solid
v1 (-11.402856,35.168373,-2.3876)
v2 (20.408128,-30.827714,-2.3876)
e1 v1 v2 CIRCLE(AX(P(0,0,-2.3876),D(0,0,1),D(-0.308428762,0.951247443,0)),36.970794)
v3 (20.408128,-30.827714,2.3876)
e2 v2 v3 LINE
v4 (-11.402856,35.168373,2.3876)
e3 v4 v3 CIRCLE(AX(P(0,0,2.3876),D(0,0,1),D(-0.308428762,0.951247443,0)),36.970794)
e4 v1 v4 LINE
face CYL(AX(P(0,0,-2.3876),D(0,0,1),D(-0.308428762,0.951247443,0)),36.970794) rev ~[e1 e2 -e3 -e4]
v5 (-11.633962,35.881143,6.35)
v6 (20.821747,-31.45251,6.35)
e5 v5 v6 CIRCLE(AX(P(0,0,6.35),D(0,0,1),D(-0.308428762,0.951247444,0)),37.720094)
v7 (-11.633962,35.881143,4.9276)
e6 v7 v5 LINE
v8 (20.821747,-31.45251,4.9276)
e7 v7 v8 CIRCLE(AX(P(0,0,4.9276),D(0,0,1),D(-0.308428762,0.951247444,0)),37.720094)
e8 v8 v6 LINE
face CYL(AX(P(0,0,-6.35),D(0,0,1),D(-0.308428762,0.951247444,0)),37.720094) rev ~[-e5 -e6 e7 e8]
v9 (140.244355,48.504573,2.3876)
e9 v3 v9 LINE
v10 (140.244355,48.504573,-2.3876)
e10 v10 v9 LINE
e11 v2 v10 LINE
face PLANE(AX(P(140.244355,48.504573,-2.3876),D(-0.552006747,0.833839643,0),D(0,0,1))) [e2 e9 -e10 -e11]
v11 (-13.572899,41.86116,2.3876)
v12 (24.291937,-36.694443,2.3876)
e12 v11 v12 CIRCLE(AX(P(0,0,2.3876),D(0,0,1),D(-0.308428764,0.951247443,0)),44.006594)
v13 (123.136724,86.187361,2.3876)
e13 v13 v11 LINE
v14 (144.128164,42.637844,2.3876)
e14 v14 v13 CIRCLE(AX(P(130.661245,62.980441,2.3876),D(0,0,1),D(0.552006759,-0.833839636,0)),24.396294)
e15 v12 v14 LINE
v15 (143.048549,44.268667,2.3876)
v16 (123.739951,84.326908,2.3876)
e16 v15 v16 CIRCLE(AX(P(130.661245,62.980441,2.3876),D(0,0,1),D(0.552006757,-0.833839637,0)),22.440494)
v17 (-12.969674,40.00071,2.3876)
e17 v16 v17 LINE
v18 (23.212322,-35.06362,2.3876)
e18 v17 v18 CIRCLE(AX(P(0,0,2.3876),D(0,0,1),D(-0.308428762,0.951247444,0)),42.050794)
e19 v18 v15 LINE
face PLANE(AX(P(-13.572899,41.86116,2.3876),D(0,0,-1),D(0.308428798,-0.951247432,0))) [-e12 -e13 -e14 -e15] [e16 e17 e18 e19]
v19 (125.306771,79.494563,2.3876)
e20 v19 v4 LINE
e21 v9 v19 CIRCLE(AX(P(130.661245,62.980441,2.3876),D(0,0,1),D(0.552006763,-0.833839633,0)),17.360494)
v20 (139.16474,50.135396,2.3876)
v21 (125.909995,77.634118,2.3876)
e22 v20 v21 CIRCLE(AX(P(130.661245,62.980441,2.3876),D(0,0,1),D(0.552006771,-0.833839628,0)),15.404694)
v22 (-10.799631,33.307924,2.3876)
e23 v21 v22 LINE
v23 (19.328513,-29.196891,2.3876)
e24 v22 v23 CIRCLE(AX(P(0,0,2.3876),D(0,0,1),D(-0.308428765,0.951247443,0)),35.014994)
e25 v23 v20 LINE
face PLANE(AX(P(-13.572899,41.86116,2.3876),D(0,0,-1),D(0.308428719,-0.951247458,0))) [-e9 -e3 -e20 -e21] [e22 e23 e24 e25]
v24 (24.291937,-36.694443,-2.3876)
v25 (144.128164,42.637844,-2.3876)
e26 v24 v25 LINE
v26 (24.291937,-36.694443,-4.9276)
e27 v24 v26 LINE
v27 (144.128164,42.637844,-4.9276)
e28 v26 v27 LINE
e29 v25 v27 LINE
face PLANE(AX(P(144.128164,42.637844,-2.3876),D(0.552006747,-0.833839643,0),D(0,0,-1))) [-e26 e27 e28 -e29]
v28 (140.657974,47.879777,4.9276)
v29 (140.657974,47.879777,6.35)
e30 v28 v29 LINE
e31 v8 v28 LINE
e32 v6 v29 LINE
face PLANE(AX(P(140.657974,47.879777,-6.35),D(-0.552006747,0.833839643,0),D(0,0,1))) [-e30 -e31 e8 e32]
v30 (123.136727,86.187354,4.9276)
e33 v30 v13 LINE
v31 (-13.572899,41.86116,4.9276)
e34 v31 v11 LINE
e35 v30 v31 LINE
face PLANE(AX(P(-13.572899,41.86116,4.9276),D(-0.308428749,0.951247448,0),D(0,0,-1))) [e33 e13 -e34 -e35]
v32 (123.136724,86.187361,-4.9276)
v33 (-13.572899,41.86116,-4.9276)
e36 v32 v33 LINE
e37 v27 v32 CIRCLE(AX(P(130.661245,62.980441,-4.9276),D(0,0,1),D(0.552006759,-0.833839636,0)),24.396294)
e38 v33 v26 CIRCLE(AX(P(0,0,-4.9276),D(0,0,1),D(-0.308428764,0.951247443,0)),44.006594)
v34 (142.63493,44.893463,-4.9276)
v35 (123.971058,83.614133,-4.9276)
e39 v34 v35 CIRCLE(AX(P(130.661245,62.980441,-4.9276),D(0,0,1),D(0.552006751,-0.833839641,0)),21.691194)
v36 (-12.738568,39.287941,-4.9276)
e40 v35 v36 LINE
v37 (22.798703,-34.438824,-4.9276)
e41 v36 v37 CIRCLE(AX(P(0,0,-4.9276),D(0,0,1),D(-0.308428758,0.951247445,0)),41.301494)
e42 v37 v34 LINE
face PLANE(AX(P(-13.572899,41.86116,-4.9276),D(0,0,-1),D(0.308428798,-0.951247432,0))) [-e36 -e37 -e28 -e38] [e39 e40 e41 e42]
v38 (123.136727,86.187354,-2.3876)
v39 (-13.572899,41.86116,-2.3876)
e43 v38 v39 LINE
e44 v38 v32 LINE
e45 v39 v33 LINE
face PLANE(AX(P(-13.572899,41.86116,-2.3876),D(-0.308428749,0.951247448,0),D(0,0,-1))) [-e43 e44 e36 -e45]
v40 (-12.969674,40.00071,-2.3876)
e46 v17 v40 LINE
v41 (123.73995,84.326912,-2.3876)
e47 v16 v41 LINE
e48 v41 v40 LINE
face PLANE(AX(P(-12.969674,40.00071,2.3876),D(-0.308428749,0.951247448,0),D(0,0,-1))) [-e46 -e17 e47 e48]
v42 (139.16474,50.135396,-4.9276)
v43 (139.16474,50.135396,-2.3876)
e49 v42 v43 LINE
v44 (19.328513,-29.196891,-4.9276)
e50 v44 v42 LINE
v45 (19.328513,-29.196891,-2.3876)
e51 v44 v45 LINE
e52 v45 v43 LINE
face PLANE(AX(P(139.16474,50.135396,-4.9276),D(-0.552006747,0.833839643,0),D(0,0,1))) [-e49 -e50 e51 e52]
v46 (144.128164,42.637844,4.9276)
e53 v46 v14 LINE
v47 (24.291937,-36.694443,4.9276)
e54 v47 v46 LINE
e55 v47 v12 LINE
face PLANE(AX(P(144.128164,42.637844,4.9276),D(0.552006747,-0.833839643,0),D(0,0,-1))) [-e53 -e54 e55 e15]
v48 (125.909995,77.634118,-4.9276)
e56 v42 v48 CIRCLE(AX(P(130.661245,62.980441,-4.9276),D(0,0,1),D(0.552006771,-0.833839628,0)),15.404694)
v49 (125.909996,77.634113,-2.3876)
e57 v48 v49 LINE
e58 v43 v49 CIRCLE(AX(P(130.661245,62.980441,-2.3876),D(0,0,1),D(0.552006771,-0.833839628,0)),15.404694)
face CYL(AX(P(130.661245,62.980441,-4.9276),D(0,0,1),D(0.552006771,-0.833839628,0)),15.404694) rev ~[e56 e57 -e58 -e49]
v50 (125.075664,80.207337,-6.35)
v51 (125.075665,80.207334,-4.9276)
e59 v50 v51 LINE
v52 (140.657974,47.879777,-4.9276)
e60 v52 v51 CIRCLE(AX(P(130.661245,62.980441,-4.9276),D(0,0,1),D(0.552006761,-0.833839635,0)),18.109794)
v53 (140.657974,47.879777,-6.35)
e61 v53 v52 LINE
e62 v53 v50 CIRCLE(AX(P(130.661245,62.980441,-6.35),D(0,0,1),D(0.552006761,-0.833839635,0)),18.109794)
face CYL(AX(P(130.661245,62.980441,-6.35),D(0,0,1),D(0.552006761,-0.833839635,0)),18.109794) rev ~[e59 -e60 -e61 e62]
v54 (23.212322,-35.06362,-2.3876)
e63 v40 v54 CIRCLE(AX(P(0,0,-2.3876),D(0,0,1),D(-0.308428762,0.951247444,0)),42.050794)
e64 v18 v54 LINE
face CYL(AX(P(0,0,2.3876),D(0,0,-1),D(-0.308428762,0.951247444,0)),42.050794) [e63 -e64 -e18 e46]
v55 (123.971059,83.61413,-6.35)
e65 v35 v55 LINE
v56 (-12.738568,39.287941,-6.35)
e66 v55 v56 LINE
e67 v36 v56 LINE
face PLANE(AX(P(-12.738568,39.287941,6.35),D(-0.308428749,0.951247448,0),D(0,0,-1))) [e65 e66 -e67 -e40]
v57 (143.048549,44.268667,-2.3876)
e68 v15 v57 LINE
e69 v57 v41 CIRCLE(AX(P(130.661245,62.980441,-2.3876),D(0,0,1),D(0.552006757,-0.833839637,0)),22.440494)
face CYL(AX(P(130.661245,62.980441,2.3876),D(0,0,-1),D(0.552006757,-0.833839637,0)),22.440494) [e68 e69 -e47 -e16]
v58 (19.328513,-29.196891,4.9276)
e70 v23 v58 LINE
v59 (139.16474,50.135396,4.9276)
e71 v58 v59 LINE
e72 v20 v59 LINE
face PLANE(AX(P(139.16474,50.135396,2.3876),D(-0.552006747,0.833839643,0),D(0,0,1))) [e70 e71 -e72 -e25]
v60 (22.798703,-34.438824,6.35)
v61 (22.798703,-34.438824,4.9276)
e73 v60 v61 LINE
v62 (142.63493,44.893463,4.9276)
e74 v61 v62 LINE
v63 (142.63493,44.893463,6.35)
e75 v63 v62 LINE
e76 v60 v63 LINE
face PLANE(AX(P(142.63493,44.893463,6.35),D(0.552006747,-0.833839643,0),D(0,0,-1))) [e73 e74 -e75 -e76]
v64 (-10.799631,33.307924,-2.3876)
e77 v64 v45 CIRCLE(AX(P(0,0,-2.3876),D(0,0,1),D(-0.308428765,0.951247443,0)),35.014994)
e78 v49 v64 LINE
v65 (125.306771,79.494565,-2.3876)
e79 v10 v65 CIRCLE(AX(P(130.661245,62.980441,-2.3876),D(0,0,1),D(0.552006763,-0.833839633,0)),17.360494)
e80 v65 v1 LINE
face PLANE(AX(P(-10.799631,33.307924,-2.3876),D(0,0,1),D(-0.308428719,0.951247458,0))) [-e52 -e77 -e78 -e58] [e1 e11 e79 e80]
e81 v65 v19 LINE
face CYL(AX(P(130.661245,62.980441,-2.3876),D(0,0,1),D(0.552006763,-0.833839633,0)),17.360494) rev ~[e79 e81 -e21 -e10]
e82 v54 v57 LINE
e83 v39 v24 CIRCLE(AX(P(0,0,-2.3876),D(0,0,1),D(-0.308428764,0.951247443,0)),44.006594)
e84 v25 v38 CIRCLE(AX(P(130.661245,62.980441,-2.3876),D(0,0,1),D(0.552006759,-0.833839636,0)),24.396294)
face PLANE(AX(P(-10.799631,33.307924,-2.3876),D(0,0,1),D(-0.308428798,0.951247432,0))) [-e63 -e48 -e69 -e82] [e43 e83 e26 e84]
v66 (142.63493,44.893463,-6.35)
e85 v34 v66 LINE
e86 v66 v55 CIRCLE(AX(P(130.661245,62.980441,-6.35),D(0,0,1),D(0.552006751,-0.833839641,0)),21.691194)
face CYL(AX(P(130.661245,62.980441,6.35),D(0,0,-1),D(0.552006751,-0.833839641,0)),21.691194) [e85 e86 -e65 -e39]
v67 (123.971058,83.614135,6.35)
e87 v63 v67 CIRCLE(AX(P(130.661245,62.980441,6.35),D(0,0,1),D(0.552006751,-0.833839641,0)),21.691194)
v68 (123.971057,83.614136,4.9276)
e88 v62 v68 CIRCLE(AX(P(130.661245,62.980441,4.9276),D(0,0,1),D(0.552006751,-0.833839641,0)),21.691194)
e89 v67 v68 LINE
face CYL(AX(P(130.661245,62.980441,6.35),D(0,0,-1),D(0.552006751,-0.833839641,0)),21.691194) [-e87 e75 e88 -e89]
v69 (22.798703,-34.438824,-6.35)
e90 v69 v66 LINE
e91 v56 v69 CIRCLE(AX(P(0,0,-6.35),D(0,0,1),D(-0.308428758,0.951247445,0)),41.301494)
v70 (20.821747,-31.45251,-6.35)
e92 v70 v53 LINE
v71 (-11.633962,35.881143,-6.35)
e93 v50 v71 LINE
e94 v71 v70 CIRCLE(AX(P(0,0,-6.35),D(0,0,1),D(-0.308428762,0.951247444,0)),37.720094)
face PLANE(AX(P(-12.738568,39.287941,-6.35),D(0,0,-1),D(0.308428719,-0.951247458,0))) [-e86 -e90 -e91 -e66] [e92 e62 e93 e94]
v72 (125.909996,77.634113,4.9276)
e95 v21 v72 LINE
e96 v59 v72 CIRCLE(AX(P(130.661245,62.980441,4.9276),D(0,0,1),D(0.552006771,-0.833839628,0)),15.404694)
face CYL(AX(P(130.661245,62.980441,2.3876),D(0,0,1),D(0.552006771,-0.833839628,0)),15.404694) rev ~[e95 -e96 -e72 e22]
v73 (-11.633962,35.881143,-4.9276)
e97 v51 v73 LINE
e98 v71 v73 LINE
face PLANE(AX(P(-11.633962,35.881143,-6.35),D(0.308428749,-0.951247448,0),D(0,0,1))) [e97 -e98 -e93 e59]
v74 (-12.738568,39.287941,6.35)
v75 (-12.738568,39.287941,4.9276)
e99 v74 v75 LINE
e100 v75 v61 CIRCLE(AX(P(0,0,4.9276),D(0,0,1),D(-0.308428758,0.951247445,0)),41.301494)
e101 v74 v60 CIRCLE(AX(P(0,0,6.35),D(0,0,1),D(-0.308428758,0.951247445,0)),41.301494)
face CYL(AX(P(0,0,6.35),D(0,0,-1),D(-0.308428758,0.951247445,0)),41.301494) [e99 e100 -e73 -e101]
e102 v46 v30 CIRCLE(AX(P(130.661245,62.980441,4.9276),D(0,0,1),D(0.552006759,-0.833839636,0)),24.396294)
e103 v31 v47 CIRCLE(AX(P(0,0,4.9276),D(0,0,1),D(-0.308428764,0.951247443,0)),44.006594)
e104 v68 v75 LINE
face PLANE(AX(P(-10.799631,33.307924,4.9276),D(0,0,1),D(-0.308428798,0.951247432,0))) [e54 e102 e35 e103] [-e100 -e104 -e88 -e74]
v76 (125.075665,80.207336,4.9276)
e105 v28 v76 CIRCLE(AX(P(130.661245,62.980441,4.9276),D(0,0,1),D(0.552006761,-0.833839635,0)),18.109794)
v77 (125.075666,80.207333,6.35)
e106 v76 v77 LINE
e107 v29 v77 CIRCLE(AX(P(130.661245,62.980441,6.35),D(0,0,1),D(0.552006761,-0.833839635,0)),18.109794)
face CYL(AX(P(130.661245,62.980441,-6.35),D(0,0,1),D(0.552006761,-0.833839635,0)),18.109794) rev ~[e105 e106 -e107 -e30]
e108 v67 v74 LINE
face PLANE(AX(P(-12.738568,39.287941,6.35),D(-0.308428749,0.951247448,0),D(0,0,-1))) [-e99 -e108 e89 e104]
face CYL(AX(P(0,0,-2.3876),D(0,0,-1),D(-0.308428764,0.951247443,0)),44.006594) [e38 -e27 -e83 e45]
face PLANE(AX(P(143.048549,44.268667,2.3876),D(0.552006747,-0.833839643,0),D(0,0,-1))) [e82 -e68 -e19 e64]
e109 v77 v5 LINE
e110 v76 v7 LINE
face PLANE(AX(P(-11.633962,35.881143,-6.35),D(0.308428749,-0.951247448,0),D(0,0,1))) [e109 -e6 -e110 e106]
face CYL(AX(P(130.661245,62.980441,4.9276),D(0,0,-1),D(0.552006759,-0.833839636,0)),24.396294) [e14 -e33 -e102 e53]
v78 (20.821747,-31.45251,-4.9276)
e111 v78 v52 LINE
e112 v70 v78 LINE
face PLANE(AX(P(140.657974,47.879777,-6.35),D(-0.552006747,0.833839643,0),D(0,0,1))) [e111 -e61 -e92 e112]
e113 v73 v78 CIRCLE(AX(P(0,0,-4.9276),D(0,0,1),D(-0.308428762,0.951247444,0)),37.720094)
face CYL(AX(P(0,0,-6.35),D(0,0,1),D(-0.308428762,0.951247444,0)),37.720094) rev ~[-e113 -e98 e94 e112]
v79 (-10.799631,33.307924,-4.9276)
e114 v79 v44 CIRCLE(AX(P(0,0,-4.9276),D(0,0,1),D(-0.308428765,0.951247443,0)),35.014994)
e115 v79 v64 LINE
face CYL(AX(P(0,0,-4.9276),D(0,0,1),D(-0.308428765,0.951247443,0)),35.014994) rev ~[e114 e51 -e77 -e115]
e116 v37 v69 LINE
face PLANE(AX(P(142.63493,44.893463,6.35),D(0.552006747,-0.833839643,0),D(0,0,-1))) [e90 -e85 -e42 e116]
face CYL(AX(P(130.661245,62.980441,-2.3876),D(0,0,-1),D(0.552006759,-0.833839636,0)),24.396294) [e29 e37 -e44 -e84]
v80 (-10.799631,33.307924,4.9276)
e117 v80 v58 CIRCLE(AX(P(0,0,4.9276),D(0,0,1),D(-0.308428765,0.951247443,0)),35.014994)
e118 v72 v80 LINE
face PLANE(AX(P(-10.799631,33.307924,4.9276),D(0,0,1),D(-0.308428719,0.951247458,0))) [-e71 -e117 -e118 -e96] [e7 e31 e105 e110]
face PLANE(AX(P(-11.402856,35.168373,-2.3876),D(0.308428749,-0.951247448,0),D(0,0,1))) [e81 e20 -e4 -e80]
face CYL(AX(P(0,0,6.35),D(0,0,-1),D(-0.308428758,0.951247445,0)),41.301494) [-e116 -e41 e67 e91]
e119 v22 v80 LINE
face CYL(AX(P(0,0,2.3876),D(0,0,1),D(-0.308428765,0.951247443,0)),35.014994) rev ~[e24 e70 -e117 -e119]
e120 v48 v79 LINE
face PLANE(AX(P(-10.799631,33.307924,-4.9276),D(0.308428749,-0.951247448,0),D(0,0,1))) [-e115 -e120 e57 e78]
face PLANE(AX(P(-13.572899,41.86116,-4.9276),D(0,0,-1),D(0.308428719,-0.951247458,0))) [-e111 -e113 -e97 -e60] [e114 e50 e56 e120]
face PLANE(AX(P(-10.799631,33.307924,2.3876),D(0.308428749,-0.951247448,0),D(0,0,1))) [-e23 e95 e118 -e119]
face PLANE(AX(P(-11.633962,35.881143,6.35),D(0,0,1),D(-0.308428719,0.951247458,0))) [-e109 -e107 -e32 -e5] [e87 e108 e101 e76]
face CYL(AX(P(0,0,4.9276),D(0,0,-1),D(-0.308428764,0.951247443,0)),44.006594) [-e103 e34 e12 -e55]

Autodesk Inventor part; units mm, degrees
ref_plane "Work Plane2" through (130.661245, 62.980441, 0) normal (-1, 0, 0) x (0, 0, 1)
ref_plane "Work Plane3" through (0, 0, 0) normal (0.9068163, 0.4215261, 0) x (0, 0, 1)
sketch "Path" plane through (0, 0, 0) normal (0, 0, 1) x (1, 0, 0)
  arc A0 (141.646452, 46.38662) -> (124.523361, 81.910736) centre (130.661245, 62.980441) ccw
  arc A1 (-12.186265, 37.584542) -> (21.810225, -32.945667) centre (0, 0) ccw
  line L0 (-12.186265, 37.584542) -> (124.523361, 81.910736)
  line L1 (141.646452, 46.38662) -> (21.810225, -32.945667)
  dimension "d31" = 8.9916
ref_plane "Section Plane" through (124.523361, 81.910736, 0) normal (-0.9512474, -0.3084287, 0) x (0, 0, 1)
sketch "Section Sketch" plane through (124.523361, 81.910736, 0) normal (-0.9512474, -0.3084287, 0) x (0, 0, 1)
  line L0 (-6.35, -1.7907) -> (6.35, -1.7907)
  line L1 (6.35, -1.7907) -> (6.35, 1.7907)
  line L2 (6.35, 1.7907) -> (-6.35, 1.7907)
  line L3 (-6.35, 1.7907) -> (-6.35, -1.7907)
  line L4 (-2.3876, -2.54) -> (2.3876, -2.54)
  line L5 (2.3876, -2.54) -> (2.3876, 2.54)
  line L6 (2.3876, 2.54) -> (-2.3876, 2.54)
  line L7 (-2.3876, 2.54) -> (-2.3876, -2.54)
  line L8 (-2.3876, 0) -> (2.3876, 0) construction
  line L9 (-4.9276, -4.4958) -> (-2.3876, -4.4958)
  line L10 (-2.3876, -4.4958) -> (-2.3876, 4.4958)
  line L11 (-2.3876, 4.4958) -> (-4.9276, 4.4958)
  line L12 (-4.9276, 4.4958) -> (-4.9276, -4.4958)
  line L13 (2.3876, -4.4958) -> (4.9276, -4.4958)
  line L14 (4.9276, -4.4958) -> (4.9276, 4.4958)
  line L15 (4.9276, 4.4958) -> (2.3876, 4.4958)
  line L16 (2.3876, 4.4958) -> (2.3876, -4.4958)
  line L17 (-6.35, 0) -> (6.35, 0) construction
  point P0 (0, 0)
  point P1 (0, 0)
  dimension "d21" = 3.5814
  dimension "d22" = 5.08
  dimension "d23" = 4.7752
  dimension "d24" = 2.54
  dimension "d31" = 8.9916
  dimension "d32" = 12.7
sweep "Solid" add profiles "Section Sketch" path "Path"
pattern_of_one "Strand Pattern"
equation "\"d21\" = da_d2"
equation "\"d22\" = da_d1"
equation "\"d23\" = da_b1"
equation "\"d24\" = da_t1 + da_t2"
equation "\"d30\" = da_pt"
equation "\"da_p\" = 9.525"
equation "\"da_b1\" = 4.7752"
equation "\"da_h2\" = 8.9916"
equation "\"da_h3\" = 7.7978"
equation "\"da_d1\" = 5.08"
equation "\"da_d2\" = 3.5814"
equation "\"da_pt\" = 10.1346"
equation "\"da_b\" = 12.7"
equation "\"da_t1\" = 1.27"
equation "\"da_t2\" = 1.27"
properties part number "Roller Chain"
